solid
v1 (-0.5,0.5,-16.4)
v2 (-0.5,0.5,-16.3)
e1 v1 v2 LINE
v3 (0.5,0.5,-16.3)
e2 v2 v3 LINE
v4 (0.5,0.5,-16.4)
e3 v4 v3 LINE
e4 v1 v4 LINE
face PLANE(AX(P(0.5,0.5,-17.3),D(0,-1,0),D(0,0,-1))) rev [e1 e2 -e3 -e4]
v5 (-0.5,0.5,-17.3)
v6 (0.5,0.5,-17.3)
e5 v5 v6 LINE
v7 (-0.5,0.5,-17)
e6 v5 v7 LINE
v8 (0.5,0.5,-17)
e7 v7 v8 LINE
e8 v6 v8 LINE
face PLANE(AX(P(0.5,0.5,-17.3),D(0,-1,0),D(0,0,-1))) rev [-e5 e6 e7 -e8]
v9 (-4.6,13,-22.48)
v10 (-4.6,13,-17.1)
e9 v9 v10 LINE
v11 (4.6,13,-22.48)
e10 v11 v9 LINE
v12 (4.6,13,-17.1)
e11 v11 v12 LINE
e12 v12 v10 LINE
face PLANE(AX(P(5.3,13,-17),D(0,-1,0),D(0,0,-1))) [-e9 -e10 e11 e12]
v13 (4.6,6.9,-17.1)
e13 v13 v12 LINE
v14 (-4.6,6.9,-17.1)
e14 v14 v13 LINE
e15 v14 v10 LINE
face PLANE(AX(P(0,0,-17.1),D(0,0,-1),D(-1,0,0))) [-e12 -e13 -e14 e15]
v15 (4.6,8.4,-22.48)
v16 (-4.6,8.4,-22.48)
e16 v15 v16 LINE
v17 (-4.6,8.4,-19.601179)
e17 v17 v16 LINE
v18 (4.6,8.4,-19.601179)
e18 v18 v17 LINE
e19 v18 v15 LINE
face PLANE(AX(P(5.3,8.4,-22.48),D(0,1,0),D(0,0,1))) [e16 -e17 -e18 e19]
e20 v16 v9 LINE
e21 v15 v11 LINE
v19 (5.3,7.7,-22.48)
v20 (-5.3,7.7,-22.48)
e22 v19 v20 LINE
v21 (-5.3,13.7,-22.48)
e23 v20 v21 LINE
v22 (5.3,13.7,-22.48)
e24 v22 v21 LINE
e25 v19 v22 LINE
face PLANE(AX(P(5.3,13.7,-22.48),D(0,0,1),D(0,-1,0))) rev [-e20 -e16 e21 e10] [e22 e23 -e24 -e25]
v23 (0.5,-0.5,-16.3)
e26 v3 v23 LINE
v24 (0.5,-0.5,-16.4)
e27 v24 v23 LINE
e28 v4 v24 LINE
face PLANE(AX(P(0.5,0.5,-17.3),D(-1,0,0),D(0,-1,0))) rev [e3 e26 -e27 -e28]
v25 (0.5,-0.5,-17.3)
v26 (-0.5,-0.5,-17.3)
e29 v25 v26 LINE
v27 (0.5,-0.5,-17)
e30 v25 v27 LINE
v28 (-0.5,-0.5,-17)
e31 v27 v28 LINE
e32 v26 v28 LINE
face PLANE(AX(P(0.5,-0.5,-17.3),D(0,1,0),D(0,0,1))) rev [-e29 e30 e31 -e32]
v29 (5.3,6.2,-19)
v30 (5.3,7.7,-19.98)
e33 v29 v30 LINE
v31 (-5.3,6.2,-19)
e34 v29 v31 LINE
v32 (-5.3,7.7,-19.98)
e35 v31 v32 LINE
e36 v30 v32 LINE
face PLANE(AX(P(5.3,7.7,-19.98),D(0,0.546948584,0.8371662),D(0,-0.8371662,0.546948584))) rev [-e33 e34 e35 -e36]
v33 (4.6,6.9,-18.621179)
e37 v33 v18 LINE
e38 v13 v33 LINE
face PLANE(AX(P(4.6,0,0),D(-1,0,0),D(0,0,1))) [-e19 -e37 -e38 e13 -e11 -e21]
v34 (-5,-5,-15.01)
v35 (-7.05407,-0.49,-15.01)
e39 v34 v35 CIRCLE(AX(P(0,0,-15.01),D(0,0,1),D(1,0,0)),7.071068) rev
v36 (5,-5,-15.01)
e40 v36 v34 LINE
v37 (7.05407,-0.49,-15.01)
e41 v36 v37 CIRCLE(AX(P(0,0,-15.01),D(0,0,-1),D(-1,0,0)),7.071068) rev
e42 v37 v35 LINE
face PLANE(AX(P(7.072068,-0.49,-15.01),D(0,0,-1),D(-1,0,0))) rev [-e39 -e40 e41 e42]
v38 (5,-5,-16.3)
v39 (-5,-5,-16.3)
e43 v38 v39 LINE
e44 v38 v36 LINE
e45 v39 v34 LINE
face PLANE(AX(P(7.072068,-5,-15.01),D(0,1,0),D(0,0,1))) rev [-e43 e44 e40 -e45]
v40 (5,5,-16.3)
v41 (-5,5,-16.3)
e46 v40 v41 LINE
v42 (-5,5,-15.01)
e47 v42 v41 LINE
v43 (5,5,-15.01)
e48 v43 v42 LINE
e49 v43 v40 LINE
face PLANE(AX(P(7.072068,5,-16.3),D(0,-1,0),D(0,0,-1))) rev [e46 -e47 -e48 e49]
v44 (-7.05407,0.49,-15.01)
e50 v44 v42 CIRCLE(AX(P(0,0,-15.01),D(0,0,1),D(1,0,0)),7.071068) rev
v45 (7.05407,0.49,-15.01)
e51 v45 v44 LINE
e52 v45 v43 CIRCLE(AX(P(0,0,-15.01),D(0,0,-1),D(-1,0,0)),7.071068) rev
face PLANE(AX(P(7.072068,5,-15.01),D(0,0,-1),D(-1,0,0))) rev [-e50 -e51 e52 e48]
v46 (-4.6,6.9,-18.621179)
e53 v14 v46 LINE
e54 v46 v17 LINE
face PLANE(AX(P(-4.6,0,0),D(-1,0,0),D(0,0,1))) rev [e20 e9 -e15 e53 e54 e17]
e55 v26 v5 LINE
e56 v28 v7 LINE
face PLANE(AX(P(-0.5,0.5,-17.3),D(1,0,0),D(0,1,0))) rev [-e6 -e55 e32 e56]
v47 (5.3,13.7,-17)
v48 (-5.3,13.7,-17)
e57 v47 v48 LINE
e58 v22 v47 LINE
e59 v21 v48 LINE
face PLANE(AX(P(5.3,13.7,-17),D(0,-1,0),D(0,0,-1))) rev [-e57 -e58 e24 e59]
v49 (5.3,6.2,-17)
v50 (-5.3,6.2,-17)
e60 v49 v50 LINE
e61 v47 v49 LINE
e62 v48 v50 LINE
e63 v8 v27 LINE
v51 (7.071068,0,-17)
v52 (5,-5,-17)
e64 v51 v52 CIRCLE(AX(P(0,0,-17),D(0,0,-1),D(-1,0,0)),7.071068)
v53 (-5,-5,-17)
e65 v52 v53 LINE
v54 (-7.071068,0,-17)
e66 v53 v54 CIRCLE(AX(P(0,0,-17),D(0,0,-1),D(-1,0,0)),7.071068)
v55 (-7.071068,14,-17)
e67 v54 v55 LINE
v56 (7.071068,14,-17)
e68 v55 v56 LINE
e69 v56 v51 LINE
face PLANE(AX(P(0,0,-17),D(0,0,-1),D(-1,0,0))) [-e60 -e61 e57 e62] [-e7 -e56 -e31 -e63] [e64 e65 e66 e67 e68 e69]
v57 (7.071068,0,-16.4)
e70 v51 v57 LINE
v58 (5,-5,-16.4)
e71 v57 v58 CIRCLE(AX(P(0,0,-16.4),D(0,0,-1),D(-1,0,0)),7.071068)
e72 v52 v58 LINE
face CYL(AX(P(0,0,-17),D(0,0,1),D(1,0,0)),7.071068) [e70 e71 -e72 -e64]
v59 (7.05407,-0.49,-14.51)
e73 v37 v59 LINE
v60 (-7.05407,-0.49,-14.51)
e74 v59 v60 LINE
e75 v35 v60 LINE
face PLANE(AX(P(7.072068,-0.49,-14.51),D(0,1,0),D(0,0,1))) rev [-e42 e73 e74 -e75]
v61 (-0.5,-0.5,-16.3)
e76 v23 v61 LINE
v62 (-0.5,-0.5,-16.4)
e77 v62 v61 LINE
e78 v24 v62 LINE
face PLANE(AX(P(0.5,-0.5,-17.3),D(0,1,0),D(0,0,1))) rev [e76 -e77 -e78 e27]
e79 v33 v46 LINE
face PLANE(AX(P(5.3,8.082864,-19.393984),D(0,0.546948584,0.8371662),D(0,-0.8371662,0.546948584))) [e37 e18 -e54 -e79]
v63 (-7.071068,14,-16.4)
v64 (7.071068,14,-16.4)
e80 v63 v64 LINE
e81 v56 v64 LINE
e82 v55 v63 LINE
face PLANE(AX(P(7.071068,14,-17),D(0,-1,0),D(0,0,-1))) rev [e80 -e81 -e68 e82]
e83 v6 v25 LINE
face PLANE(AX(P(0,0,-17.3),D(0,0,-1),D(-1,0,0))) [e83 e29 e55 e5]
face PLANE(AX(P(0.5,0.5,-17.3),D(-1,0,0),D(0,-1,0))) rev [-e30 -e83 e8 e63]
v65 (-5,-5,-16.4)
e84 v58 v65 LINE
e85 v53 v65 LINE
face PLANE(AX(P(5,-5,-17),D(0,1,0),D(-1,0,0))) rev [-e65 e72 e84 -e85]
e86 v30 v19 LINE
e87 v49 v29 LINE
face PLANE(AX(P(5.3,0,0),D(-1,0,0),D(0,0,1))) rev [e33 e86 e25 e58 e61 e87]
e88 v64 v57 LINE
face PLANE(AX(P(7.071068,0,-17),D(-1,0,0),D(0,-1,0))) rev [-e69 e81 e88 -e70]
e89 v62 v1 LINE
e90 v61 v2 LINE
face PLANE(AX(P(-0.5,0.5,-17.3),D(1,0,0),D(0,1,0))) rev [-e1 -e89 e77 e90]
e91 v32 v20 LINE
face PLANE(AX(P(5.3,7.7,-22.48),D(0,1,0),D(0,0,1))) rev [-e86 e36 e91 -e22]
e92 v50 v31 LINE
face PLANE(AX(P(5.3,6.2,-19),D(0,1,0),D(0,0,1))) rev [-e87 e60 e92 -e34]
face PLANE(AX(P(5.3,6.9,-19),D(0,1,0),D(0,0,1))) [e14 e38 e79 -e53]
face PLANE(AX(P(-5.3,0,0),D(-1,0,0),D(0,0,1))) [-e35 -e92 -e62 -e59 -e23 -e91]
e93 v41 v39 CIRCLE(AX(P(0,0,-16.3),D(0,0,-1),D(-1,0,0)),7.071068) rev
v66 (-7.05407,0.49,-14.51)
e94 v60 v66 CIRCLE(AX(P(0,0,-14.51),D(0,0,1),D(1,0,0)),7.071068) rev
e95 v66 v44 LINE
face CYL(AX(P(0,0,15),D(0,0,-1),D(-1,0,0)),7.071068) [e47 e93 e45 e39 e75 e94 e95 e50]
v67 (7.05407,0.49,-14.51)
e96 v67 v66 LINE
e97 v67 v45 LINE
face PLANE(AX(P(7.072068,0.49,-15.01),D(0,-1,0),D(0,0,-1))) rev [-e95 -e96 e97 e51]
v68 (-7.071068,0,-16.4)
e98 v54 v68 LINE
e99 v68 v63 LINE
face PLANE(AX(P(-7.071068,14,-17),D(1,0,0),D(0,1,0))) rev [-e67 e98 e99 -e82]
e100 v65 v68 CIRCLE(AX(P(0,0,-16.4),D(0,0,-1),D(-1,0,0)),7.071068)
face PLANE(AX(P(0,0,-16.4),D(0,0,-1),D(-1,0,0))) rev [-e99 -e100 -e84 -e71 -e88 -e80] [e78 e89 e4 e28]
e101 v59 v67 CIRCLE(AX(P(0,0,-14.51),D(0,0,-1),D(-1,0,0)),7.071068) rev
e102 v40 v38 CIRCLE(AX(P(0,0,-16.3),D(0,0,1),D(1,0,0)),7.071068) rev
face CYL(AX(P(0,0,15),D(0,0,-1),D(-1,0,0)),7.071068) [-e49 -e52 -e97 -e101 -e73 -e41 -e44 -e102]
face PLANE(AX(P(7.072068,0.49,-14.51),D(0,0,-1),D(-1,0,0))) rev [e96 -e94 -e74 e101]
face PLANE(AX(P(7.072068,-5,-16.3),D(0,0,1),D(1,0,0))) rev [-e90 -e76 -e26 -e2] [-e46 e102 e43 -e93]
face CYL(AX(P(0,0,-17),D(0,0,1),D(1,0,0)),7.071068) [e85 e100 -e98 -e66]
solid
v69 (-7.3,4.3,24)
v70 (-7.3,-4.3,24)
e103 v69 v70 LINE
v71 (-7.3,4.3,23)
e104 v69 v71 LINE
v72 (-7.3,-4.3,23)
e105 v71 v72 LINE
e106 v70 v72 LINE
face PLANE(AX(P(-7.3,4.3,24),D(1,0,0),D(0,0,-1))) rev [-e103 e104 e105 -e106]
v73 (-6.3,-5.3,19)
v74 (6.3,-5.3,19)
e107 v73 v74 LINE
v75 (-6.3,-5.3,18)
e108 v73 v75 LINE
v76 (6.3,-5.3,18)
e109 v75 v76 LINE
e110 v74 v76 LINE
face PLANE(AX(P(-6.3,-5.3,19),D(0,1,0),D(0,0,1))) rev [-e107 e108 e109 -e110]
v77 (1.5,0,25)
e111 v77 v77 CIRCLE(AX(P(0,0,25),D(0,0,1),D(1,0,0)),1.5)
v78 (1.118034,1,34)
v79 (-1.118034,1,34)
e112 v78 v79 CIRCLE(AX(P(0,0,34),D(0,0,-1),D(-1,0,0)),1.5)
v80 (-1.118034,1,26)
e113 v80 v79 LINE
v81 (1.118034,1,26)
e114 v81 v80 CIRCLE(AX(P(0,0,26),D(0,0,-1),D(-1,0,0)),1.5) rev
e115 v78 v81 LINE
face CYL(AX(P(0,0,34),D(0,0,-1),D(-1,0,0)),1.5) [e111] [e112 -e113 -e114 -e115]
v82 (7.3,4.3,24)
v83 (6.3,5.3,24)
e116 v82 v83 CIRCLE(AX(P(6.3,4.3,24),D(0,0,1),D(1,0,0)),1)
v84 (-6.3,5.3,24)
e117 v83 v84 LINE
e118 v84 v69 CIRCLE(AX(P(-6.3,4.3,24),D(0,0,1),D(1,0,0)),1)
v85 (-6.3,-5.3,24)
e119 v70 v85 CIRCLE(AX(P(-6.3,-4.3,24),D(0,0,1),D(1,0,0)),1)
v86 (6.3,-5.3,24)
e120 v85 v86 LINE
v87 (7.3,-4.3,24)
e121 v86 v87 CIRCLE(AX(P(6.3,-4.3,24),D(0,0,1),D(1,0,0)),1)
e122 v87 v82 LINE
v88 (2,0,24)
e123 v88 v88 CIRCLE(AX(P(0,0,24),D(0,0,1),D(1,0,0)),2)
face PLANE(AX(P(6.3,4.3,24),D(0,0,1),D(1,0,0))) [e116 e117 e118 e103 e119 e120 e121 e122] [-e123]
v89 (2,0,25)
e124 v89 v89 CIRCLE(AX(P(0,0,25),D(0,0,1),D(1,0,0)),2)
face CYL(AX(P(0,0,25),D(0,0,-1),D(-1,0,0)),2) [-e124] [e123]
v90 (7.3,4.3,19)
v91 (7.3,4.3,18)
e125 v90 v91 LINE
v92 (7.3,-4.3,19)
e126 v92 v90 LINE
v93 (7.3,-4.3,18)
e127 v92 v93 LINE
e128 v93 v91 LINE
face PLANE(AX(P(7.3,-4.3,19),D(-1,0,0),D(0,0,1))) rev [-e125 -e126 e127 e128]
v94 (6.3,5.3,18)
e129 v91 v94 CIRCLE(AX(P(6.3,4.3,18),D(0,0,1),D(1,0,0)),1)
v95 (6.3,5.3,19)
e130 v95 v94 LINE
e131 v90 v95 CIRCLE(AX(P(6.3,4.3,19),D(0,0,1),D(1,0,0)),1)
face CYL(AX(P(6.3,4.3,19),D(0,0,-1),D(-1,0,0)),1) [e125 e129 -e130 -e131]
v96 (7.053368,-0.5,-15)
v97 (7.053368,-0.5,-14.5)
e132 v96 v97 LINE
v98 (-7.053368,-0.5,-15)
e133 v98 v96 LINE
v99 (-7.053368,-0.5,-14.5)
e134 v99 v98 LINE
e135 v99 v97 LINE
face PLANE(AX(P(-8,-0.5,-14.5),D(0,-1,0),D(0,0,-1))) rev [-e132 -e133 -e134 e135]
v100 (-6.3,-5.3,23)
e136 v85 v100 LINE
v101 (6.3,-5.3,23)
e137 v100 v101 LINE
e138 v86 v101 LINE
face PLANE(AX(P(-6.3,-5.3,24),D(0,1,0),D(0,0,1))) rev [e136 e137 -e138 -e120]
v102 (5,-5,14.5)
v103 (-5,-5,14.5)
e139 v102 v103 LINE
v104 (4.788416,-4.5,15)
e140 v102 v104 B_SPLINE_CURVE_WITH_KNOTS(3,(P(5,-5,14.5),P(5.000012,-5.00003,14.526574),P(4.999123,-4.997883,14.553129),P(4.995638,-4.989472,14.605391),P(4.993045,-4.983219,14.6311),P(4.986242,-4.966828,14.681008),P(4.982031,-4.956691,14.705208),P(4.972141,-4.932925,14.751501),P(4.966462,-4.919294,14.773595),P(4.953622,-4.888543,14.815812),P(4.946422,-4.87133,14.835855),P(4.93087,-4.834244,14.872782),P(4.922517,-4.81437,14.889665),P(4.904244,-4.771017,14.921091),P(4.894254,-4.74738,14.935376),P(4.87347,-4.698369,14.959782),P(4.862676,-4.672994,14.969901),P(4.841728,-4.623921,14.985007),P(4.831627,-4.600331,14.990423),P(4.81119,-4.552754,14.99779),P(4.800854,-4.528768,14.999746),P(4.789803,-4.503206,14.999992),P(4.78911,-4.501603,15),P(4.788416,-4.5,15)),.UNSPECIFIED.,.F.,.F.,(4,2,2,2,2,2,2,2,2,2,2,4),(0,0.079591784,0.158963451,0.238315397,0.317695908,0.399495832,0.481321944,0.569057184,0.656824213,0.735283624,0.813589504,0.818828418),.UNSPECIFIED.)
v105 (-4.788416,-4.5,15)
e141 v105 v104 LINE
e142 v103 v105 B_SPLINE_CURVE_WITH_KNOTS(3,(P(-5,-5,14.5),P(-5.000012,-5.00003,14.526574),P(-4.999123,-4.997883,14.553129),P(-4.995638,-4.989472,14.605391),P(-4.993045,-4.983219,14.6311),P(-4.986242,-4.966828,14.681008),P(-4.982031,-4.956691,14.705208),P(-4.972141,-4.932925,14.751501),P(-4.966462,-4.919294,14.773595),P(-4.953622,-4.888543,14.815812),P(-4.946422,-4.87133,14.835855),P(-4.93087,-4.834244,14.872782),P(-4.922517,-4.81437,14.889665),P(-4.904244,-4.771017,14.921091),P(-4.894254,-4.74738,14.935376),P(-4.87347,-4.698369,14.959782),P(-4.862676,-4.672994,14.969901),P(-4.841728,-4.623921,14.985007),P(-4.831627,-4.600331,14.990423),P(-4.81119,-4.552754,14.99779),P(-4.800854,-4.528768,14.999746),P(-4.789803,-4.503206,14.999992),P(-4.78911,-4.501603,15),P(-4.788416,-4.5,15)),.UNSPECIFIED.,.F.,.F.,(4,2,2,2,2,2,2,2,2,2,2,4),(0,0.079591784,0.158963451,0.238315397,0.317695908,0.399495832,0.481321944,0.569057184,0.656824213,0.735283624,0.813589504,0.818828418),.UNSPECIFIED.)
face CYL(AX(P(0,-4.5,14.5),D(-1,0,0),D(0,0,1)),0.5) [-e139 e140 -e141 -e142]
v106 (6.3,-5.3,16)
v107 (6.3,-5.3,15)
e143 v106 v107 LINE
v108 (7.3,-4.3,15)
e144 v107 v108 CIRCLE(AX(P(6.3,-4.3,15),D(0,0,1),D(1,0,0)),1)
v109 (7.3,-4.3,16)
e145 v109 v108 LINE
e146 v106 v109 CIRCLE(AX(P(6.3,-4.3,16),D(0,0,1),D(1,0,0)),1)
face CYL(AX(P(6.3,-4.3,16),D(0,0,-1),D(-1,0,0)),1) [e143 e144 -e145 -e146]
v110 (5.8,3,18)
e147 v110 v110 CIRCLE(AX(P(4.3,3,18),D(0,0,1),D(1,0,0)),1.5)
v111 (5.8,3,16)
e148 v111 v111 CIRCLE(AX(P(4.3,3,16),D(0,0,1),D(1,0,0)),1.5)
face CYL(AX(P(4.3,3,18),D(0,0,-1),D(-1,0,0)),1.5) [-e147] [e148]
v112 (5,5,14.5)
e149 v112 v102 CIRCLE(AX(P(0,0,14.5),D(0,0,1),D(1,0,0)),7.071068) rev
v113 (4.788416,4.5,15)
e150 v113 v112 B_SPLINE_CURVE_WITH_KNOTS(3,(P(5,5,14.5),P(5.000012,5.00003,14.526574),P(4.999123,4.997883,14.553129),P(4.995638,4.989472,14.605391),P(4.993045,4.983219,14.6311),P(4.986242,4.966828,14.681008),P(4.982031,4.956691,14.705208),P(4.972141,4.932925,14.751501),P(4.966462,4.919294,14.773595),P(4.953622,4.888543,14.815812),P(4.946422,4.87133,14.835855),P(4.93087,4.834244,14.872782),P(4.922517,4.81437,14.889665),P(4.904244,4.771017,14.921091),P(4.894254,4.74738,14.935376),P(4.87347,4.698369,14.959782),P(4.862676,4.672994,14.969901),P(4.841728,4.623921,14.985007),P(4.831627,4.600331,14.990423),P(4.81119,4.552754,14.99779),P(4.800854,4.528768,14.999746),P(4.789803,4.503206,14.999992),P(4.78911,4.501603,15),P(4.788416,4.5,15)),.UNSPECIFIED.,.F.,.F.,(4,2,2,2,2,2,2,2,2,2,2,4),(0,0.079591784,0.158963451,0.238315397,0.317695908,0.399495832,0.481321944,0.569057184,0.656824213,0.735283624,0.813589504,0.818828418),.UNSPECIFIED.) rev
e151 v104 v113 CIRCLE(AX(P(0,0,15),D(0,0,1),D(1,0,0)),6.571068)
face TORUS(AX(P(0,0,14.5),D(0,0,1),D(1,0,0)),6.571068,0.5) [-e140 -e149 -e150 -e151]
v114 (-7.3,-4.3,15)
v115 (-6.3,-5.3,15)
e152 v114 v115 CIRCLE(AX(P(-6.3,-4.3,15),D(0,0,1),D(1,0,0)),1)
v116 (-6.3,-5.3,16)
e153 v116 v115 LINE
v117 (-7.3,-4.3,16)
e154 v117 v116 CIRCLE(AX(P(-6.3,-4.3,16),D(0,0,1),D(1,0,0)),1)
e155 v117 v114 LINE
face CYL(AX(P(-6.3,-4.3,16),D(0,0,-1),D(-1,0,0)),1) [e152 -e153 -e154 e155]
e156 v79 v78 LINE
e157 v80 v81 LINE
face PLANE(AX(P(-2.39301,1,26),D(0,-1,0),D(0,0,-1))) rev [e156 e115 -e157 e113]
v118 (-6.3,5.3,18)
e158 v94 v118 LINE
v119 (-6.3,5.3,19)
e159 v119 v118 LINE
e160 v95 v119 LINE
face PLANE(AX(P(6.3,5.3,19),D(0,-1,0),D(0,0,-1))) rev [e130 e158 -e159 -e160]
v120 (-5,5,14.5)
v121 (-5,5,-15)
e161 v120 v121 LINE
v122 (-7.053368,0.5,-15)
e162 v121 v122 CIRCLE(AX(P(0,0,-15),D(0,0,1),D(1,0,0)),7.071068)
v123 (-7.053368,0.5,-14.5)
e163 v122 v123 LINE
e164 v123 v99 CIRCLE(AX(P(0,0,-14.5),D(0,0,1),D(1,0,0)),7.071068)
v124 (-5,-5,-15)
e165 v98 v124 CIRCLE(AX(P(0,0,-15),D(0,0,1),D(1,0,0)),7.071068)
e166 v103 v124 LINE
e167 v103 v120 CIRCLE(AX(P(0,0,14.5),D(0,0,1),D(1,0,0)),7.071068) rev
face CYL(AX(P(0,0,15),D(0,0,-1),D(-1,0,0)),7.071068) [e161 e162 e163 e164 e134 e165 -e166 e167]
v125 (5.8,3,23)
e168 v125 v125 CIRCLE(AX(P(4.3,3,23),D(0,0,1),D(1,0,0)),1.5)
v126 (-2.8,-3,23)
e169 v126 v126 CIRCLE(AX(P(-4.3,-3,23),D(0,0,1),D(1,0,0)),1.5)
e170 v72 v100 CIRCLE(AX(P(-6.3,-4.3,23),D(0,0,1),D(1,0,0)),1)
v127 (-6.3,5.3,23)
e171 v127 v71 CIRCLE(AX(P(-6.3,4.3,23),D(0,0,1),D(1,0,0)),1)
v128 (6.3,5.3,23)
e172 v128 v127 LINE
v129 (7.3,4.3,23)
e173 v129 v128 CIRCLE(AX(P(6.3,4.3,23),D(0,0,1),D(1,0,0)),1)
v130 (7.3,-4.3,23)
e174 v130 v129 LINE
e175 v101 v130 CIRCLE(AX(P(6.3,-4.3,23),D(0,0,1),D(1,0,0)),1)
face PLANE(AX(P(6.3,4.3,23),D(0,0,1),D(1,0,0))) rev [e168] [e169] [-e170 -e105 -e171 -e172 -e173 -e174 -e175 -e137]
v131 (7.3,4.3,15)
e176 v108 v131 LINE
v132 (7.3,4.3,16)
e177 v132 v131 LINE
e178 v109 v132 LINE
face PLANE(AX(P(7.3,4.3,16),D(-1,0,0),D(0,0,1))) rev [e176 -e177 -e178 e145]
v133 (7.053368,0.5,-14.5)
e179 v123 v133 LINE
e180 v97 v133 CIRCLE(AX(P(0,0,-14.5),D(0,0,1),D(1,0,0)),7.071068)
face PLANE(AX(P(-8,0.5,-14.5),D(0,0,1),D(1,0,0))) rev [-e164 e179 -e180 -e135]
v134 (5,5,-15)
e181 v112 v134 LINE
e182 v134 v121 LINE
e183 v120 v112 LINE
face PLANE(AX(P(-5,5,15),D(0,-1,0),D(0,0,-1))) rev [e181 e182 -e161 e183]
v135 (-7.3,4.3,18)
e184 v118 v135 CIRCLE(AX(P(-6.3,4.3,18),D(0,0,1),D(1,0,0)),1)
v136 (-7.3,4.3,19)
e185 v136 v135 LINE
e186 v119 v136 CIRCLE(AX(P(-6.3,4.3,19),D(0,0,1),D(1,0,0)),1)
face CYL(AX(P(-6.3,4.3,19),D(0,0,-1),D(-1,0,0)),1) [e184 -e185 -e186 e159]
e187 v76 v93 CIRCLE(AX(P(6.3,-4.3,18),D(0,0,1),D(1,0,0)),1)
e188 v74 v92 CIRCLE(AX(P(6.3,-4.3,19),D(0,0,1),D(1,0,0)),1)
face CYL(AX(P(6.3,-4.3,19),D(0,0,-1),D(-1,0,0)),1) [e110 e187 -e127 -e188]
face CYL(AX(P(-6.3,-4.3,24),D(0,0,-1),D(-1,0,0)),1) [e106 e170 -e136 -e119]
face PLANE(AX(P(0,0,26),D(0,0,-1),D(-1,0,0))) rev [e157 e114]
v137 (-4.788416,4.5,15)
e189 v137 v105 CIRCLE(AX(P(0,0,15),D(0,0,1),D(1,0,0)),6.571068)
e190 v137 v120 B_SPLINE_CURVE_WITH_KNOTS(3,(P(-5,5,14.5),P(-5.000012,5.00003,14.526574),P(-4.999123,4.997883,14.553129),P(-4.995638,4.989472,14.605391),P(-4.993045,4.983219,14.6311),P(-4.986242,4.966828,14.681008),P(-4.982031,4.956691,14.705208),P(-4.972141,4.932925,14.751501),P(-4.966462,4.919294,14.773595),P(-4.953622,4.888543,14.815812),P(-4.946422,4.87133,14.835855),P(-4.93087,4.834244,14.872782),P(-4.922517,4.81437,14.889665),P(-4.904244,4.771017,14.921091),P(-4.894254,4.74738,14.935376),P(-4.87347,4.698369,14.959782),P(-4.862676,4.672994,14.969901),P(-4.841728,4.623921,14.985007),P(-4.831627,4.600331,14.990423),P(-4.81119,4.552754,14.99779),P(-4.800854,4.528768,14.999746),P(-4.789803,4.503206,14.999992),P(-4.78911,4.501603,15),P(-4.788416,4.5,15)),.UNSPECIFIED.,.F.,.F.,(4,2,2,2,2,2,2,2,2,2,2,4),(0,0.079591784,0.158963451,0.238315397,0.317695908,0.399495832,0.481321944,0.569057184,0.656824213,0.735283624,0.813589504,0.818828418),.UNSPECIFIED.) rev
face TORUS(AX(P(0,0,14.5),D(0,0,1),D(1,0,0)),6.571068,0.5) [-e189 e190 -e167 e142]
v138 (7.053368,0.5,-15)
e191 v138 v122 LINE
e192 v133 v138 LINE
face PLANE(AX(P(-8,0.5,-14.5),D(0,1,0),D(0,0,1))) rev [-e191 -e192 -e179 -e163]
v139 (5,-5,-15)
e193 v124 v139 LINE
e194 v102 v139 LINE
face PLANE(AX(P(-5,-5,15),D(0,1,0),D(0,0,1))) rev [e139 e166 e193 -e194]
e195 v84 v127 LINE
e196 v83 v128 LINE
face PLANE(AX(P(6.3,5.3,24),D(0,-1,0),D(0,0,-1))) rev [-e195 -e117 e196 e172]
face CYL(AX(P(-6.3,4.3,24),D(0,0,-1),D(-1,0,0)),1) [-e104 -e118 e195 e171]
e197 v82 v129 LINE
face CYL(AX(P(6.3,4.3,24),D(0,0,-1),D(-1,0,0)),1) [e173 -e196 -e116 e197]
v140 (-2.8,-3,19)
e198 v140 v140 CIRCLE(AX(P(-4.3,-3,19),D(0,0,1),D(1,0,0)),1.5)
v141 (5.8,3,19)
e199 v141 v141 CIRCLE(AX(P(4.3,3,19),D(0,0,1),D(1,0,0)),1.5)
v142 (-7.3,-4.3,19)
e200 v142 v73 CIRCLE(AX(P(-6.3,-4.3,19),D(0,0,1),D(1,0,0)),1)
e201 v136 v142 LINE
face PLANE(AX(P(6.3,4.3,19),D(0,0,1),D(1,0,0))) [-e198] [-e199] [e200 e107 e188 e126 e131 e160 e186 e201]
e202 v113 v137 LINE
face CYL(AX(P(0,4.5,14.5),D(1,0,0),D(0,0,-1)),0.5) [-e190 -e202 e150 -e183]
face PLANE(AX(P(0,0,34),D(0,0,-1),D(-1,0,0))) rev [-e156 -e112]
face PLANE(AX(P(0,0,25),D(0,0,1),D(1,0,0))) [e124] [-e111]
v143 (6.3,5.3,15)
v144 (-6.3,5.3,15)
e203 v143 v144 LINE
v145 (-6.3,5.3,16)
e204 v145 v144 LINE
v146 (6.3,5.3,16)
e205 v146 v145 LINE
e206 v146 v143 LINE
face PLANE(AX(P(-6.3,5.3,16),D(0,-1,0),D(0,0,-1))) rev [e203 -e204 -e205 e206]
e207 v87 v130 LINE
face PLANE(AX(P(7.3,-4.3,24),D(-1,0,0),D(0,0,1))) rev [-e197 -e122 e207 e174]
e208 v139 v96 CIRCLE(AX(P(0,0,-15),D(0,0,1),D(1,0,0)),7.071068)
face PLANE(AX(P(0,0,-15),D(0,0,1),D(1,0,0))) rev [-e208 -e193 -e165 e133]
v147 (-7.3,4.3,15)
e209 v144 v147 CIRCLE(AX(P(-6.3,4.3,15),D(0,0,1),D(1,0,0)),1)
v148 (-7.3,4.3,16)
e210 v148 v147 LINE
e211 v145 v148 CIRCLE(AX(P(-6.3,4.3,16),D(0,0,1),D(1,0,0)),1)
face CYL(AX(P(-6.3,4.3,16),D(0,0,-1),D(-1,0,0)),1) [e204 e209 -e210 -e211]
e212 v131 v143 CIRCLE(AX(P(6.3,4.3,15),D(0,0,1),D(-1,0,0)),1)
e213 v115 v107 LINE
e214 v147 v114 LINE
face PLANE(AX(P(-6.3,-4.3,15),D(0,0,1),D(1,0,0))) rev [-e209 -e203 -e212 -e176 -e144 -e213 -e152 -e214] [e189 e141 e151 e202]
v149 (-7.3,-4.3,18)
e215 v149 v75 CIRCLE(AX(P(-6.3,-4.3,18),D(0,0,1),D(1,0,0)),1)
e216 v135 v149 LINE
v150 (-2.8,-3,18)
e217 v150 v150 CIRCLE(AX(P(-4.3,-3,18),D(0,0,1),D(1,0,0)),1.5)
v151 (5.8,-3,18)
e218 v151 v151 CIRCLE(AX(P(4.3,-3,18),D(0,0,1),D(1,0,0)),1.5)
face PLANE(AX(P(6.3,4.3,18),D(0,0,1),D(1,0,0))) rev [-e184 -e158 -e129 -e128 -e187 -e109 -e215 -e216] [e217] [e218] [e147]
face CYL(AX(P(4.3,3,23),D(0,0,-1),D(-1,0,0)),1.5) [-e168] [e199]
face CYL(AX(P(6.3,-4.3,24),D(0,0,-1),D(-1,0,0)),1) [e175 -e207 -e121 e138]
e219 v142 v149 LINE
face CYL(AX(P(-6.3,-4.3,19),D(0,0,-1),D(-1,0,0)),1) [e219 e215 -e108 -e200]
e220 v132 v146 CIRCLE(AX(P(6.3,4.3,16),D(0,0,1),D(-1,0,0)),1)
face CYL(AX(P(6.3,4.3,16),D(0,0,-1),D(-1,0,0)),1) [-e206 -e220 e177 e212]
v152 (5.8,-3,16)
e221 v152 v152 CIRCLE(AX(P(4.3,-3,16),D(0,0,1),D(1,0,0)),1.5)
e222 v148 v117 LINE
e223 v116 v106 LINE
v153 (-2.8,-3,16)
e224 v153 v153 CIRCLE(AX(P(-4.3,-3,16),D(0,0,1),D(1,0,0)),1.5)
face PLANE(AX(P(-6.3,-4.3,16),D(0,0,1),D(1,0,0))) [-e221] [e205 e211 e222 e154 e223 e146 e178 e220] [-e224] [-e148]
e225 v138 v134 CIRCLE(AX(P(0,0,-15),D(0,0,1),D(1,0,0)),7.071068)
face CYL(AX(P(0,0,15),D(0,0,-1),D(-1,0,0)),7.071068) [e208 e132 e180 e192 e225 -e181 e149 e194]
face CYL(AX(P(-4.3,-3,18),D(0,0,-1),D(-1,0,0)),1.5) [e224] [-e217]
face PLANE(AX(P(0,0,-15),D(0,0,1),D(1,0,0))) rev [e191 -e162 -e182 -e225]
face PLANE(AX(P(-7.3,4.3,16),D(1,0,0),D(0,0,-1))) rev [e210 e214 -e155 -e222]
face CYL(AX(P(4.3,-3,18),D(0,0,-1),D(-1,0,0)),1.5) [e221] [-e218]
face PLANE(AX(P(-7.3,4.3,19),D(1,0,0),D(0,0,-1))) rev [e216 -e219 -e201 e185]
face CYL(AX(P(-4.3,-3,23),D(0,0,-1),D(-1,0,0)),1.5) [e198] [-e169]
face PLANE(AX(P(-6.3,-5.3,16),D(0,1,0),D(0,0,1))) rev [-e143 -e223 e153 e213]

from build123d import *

# Parameters (mm, degrees)
BOSS_EXTRUDE1_DEPTH                  = 15
FILLET1_R                            = 0.5
SKETCH2_W                            = 1
SKETCH2_H                            = 1
CUT_EXTRUDE1_DEPTH                   = 8
BOSS_EXTRUDE2_REACH                  = 19.321
BOSS_EXTRUDE2_END_RADIUS             = 7.071067812
BOSS_EXTRUDE2_DIRECTION_2_REACH      = 19.321
BOSS_EXTRUDE2_DIRECTION_2_END_RADIUS = 7.071067812
SKETCH4_W                            = 1
SKETCH4_H                            = 1
BOSS_EXTRUDE3_DEPTH                  = 1
BOSS_EXTRUDE4_DEPTH                  = 0.6
BOSS_EXTRUDE5_DEPTH                  = 5.3
SHELL1_START                         = -4.6
SHELL1_DEPTH                         = 9.2
BOSS_EXTRUDE6_DEPTH                  = 1
SKETCH8_R                            = 1.5
BOSS_EXTRUDE7_DEPTH                  = 2
BOSS_EXTRUDE8_DEPTH                  = 1
SKETCH12_R                           = 1.5
BOSS_EXTRUDE9_DEPTH                  = 4
BOSS_EXTRUDE10_DEPTH                 = 1
SKETCH14_R                           = 1.5
CUT_EXTRUDE2_DEPTH                   = 1
BOSS_EXTRUDE11_START                 = 1
SKETCH15_R                           = 2
SKETCH15_R_2                         = 1.5
BOSS_EXTRUDE11_DEPTH                 = 1
BOSS_EXTRUDE12_START                 = -11
SKETCH16_R                           = 1.5
BOSS_EXTRUDE12_DEPTH                 = 11
SKETCH17_W                           = 4.75514305
SKETCH17_H                           = 2
CUT_EXTRUDE3_DEPTH                   = 8


# Read off the part's stored shape, not the designer's step: Shell1
with BuildPart() as part:
    # Sketch1 → Boss-Extrude1 (new, symmetric)
    with BuildSketch(Plane.XY):
        with BuildLine():
            Line((-5, 5), (5, 5))
            ThreePointArc((5, 5), (7.071067812, 0), (5, -5))
            Line((5, -5), (-5, -5))
            ThreePointArc((-5, -5), (-7.071067812, 0), (-5, 5))
        make_face()
    extrude(amount=BOSS_EXTRUDE1_DEPTH, both=True)

    # Fillet1
    fillet1_edges = [part.edges().sort_by_distance(p)[0] for p in [
        (-7.071067812, 0, 15),
        (0, -5, 15),
        (7.071067812, 0, 15),
        (0, 5, 15),
    ]]
    fillet(fillet1_edges, radius=FILLET1_R)

    # Sketch2 → Cut-Extrude1 (cut, symmetric)
    with BuildSketch(Plane(origin=(0, 0, 0), x_dir=(0, 0, -1), z_dir=(1, 0, 0))):
        with Locations((15, 0)):
            Rectangle(SKETCH2_W, SKETCH2_H)
    extrude(amount=CUT_EXTRUDE1_DEPTH, both=True, mode=Mode.SUBTRACT)

    # Sketch7 → Boss-Extrude6 (add)
    with BuildSketch(Plane.XY.offset(15)):
        with BuildLine():
            Line((-6.3, 5.3), (6.3, 5.3))
            ThreePointArc((6.3, 5.3), (7.007106781, 5.007106781), (7.3, 4.3))
            Line((7.3, 4.3), (7.3, -4.3))
            ThreePointArc((7.3, -4.3), (7.007106781, -5.007106781), (6.3, -5.3))
            Line((6.3, -5.3), (-6.3, -5.3))
            ThreePointArc((-6.3, -5.3), (-7.007106781, -5.007106781), (-7.3, -4.3))
            Line((-7.3, -4.3), (-7.3, 4.3))
            ThreePointArc((-7.3, 4.3), (-7.007106781, 5.007106781), (-6.3, 5.3))
        make_face()
    extrude(amount=BOSS_EXTRUDE6_DEPTH)

    # Sketch8 → Boss-Extrude7 (add)
    with BuildSketch(Plane.XY.offset(16)):
        with Locations((4.3, 3)):
            Circle(SKETCH8_R)
        with Locations((4.3, -3)):
            Circle(SKETCH8_R)
        with Locations((-4.3, -3)):
            Circle(SKETCH8_R)
    extrude(amount=BOSS_EXTRUDE7_DEPTH)

    # Sketch10 → Boss-Extrude8 (add)
    with BuildSketch(Plane.XY.offset(18)):
        with BuildLine():
            Line((7.3, -4.3), (7.3, 4.3))
            ThreePointArc((7.3, 4.3), (7.007106781, 5.007106781), (6.3, 5.3))
            Line((6.3, 5.3), (-6.3, 5.3))
            ThreePointArc((-6.3, 5.3), (-7.007106781, 5.007106781), (-7.3, 4.3))
            Line((-7.3, 4.3), (-7.3, -4.3))
            ThreePointArc((-7.3, -4.3), (-7.007106781, -5.007106781), (-6.3, -5.3))
            Line((-6.3, -5.3), (6.3, -5.3))
            ThreePointArc((6.3, -5.3), (7.007106781, -5.007106781), (7.3, -4.3))
        make_face()
    extrude(amount=BOSS_EXTRUDE8_DEPTH)

    # Sketch12 → Boss-Extrude9 (add)
    with BuildSketch(Plane.XY.offset(19)):
        with Locations((-4.3, -3)):
            Circle(SKETCH12_R)
        with Locations((4.3, 3)):
            Circle(SKETCH12_R)
    extrude(amount=BOSS_EXTRUDE9_DEPTH)

    # Sketch13 → Boss-Extrude10 (add)
    with BuildSketch(Plane.XY.offset(23)):
        with BuildLine():
            Line((6.3, 5.3), (-6.3, 5.3))
            ThreePointArc((-6.3, 5.3), (-7.007106781, 5.007106781), (-7.3, 4.3))
            Line((-7.3, 4.3), (-7.3, -4.3))
            ThreePointArc((-7.3, -4.3), (-7.007106781, -5.007106781), (-6.3, -5.3))
            Line((-6.3, -5.3), (6.3, -5.3))
            ThreePointArc((6.3, -5.3), (7.007106781, -5.007106781), (7.3, -4.3))
            Line((7.3, -4.3), (7.3, 4.3))
            ThreePointArc((7.3, 4.3), (7.007106781, 5.007106781), (6.3, 5.3))
        make_face()
    extrude(amount=BOSS_EXTRUDE10_DEPTH)

    # Sketch14 → Cut-Extrude2 (cut)
    with BuildSketch(Plane.XY.offset(24)):
        Circle(SKETCH14_R)
    extrude(amount=-CUT_EXTRUDE2_DEPTH, mode=Mode.SUBTRACT)

    # Sketch15 → Boss-Extrude11 (add)
    with BuildSketch(Plane.XY.offset(24).offset(BOSS_EXTRUDE11_START)):
        Circle(SKETCH15_R)
        Circle(SKETCH15_R_2, mode=Mode.SUBTRACT)
    extrude(amount=-BOSS_EXTRUDE11_DEPTH)

    # Sketch16 → Boss-Extrude12 (add)
    with BuildSketch(Plane(origin=(0, 0, 23), x_dir=(-1, 0, 0), z_dir=(0, 0, -1)).offset(BOSS_EXTRUDE12_START)):
        Circle(SKETCH16_R)
    extrude(amount=BOSS_EXTRUDE12_DEPTH)

    # Sketch17 → Cut-Extrude3 (cut)
    with BuildSketch(Plane.XY.offset(34)):
        with Locations((-0.015438776, 2)):
            Rectangle(SKETCH17_W, SKETCH17_H)
    extrude(amount=-CUT_EXTRUDE3_DEPTH, mode=Mode.SUBTRACT)


with BuildPart() as body_2:
    # Boss-Extrude2: up to this cylinder (the profile starts inside it)
    boss_extrude2_end = Plane(origin=(0, 0, -15.622248), z_dir=(0, 0, -1)) * Cylinder(BOSS_EXTRUDE2_END_RADIUS, 53.784135624, mode=Mode.PRIVATE)
    # Sketch3 → Boss-Extrude2 (new, up to the surface)
    with BuildSketch(Plane(origin=(0, 0, 0), x_dir=(0, 0, -1), z_dir=(1, 0, 0)), mode=Mode.PRIVATE) as boss_extrude2_sk1:
        Polygon((15.01, -5), (16.3, -5), (16.3, 5), (15.01, 5), (15.01, 0.49), (14.51, 0.49), (14.51, -0.49), (15.01, -0.49), align=None)
    boss_extrude2_tool1 = extrude(boss_extrude2_sk1.sketch, amount=BOSS_EXTRUDE2_REACH, mode=Mode.PRIVATE) & boss_extrude2_end
    add(boss_extrude2_tool1.solids().sort_by_distance((0, 0, -15.622248))[0])

    # Boss-Extrude2 direction 2: up to this cylinder (the profile starts inside it)
    boss_extrude2_direction_2_end = Plane(origin=(0, 0, -15.622248), z_dir=(0, 0, -1)) * Cylinder(BOSS_EXTRUDE2_DIRECTION_2_END_RADIUS, 53.784135624, mode=Mode.PRIVATE)
    # Sketch3 → Boss-Extrude2 direction 2 (add, up to the surface)
    with BuildSketch(Plane(origin=(0, 0, 0), x_dir=(0, 0, -1), z_dir=(1, 0, 0)), mode=Mode.PRIVATE) as boss_extrude2_direction_2_sk1:
        Polygon((15.01, -5), (16.3, -5), (16.3, 5), (15.01, 5), (15.01, 0.49), (14.51, 0.49), (14.51, -0.49), (15.01, -0.49), align=None)
    boss_extrude2_direction_2_tool1 = extrude(boss_extrude2_direction_2_sk1.sketch, amount=-BOSS_EXTRUDE2_DIRECTION_2_REACH, mode=Mode.PRIVATE) & boss_extrude2_direction_2_end
    add(boss_extrude2_direction_2_tool1.solids().sort_by_distance((0, 0, -15.622248))[0])

    # Sketch4 → Boss-Extrude3 (add)
    with BuildSketch(Plane(origin=(0, 0, -16.3), x_dir=(-1, 0, 0), z_dir=(0, 0, -1))):
        Rectangle(SKETCH4_W, SKETCH4_H)
    extrude(amount=BOSS_EXTRUDE3_DEPTH)

    # Sketch5 → Boss-Extrude4 (add)
    with BuildSketch(Plane(origin=(0, 0, -16.4), x_dir=(-1, 0, 0), z_dir=(0, 0, -1))):
        with BuildLine():
            Line((-5, -5), (5, -5))
            ThreePointArc((5, -5), (6.532814824, -2.705980501), (7.071067812, 0))
            Line((7.071067812, 0), (7.071067812, 14))
            Line((7.071067812, 14), (-7.071067812, 14))
            Line((-7.071067812, 14), (-7.071067812, 0))
            ThreePointArc((-7.071067812, 0), (-6.532814824, -2.705980501), (-5, -5))
        make_face()
    extrude(amount=BOSS_EXTRUDE4_DEPTH)

    # Sketch6 → Boss-Extrude5 (add, symmetric)
    with BuildSketch(Plane(origin=(0, 0, 0), x_dir=(0, 0, -1), z_dir=(1, 0, 0))):
        Polygon((17, 13.7), (22.48, 13.7), (22.48, 7.7), (19.98, 7.7), (19, 6.2), (17, 6.2), align=None)
    extrude(amount=BOSS_EXTRUDE5_DEPTH, both=True)

    # Shell1 outline → Shell1 (cut)
    with BuildSketch(Plane.YZ.offset(SHELL1_START)):
        Polygon((13, -17.1), (6.9, -17.1), (6.9, -18.621179174), (8.4, -19.601179174), (8.4, -22.48), (13, -22.48), align=None)
    extrude(amount=SHELL1_DEPTH, mode=Mode.SUBTRACT)


solid = Compound([part.part, body_2.part])
